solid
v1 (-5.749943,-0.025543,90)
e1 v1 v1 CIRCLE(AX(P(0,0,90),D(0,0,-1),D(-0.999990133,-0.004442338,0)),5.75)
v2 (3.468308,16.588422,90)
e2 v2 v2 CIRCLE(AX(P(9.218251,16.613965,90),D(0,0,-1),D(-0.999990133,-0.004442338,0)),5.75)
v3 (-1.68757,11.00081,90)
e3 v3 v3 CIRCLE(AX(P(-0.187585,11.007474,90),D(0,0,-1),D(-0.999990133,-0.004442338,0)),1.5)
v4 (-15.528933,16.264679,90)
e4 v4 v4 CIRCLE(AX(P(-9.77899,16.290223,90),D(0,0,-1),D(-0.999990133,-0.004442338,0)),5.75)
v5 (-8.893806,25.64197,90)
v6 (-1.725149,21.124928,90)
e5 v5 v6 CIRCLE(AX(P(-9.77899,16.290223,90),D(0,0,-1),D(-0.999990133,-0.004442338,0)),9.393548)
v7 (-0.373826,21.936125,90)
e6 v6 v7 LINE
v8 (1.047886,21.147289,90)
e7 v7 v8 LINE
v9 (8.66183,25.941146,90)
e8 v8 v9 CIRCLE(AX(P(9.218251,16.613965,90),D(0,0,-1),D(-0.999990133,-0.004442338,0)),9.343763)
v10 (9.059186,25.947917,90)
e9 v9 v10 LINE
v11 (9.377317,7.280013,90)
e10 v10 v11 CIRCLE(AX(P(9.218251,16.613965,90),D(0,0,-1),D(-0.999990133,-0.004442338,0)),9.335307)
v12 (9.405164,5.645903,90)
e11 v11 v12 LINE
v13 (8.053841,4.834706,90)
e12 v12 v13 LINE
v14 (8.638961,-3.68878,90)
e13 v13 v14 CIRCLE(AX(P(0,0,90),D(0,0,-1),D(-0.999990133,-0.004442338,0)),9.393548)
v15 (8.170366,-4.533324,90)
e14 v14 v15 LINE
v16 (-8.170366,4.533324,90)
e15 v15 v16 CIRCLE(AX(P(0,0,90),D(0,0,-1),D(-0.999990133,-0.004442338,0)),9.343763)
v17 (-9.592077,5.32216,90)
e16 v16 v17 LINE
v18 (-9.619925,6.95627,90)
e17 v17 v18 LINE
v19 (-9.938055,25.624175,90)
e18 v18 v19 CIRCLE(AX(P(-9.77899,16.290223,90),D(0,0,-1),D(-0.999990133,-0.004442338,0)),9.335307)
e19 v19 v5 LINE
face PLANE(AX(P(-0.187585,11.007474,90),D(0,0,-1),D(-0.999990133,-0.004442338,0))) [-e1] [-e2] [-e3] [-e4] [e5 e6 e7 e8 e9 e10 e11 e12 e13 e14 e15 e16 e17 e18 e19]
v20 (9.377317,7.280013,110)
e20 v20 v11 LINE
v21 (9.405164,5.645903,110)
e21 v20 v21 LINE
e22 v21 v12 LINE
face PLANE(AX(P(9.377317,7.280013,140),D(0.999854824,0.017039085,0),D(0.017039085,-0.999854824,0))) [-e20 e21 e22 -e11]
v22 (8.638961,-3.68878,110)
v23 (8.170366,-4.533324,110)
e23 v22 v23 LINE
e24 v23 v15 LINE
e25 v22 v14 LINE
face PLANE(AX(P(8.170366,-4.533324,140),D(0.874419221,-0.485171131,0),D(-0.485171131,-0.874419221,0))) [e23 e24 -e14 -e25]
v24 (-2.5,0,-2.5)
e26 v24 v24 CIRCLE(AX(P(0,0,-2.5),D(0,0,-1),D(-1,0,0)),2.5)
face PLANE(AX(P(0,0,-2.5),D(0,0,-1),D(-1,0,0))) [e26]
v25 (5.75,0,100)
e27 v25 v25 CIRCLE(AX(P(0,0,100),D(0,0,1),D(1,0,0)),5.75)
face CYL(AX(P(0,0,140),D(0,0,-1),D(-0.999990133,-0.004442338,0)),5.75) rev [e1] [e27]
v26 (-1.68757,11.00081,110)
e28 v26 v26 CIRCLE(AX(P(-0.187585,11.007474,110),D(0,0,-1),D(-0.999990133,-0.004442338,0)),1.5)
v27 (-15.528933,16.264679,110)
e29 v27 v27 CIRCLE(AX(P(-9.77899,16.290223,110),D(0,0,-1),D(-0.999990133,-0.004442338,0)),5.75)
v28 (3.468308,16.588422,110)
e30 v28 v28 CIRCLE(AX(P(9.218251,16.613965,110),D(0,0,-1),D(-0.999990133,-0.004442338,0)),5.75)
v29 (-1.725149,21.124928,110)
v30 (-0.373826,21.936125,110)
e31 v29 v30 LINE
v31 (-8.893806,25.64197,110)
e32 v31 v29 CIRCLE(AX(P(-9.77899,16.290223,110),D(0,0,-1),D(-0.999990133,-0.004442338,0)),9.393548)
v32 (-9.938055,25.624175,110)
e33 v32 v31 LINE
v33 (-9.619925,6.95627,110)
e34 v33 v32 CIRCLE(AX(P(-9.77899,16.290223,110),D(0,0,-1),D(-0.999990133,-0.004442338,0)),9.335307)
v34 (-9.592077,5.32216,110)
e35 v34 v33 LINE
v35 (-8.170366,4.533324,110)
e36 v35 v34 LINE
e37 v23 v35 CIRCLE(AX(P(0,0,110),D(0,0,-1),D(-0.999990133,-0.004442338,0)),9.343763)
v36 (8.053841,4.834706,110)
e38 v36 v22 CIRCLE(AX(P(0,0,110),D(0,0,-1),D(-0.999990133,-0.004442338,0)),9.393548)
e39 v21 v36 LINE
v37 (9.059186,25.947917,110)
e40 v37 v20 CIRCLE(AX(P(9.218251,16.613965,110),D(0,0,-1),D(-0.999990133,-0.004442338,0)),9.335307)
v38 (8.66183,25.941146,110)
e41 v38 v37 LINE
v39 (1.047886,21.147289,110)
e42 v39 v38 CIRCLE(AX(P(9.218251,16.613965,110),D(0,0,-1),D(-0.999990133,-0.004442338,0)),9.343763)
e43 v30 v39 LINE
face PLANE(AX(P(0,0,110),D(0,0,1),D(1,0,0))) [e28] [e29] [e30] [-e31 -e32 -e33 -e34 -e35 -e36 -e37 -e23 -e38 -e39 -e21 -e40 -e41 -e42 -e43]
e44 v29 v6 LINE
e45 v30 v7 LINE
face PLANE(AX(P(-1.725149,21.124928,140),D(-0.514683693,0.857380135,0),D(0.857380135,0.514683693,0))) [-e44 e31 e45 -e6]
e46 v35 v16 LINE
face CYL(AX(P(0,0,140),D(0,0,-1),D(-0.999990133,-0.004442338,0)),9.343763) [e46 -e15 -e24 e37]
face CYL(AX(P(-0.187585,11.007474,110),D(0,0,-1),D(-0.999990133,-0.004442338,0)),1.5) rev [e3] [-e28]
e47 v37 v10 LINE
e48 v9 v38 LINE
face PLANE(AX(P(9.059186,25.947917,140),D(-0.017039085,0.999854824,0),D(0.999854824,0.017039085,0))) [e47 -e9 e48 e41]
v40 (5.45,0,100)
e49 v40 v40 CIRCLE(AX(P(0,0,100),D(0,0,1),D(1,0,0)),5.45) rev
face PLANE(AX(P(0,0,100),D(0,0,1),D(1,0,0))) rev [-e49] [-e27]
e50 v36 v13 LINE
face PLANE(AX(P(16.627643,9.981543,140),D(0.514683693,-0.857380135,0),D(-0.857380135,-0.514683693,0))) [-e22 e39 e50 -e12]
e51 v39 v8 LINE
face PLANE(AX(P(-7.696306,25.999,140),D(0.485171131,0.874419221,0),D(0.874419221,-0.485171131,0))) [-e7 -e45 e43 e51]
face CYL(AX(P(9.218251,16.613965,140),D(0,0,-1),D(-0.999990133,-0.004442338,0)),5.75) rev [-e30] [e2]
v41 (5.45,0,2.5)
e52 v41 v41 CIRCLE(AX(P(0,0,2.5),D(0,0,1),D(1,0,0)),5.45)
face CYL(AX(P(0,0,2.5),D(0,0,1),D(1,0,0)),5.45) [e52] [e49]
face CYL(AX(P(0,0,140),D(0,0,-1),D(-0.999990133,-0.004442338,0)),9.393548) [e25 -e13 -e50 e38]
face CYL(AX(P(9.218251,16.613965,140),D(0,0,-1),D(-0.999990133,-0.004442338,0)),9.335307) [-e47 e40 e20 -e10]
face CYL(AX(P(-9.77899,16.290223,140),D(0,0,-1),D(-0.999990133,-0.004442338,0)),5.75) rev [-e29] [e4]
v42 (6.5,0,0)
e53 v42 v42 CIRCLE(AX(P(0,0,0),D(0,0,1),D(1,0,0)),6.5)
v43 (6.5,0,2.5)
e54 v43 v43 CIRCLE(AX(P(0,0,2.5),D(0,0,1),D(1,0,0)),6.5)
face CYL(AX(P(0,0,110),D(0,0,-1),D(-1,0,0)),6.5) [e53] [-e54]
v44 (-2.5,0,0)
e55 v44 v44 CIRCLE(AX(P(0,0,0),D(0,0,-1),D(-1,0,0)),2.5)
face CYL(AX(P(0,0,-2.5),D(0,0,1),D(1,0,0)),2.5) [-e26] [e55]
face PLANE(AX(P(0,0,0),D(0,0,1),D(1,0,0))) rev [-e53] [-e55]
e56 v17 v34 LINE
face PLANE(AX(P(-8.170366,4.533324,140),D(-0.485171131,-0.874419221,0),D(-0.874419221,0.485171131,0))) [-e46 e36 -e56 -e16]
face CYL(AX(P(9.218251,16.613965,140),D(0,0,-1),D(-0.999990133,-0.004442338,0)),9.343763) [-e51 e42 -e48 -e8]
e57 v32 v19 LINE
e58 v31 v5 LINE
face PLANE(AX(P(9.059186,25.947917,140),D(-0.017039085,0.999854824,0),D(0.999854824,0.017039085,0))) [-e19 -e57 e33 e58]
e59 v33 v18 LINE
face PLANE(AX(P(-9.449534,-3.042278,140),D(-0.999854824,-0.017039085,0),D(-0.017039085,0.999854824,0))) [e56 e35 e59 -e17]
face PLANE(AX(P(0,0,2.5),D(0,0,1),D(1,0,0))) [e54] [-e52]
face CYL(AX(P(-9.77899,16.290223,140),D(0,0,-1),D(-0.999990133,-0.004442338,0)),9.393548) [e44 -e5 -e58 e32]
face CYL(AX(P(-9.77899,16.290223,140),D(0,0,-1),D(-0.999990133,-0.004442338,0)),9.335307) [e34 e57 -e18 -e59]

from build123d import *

# Parameters (mm, degrees)
SKETCH1_R           = 6.5
BOSS_EXTRUDE1_DEPTH = 110
SKETCH6_R           = 2.5
BOSS_EXTRUDE2_DEPTH = 2.5
SKETCH7_R           = 2.65
CUT_EXTRUDE1_DEPTH  = 3
SKETCH9_OUTSIDE_W   = 37.798
SKETCH9_OUTSIDE_H   = 37.798
SKETCH9_OUTSIDE_R   = 5.45
CUT_EXTRUDE2_DEPTH  = 107.5
SKETCH10_R          = 5.75
BOSS_EXTRUDE3_DEPTH = 10
JOIN1_START         = 90
JOIN1_OUTLINE_R     = 5.75
JOIN1_OUTLINE_R_2   = 1.5
JOIN1_DEPTH         = 20


# Read off the part's stored shape, not the designer's step: Join1
with BuildPart() as part:
    # Sketch1 → Boss-Extrude1 (new body)
    with BuildSketch(Plane.XY):
        Circle(SKETCH1_R)
    extrude(amount=BOSS_EXTRUDE1_DEPTH)

    # Sketch6 → Boss-Extrude2 (add)
    with BuildSketch(Plane(origin=(0, 0, 0), x_dir=(-1, 0, 0), z_dir=(0, 0, -1))):
        Circle(SKETCH6_R)
    extrude(amount=BOSS_EXTRUDE2_DEPTH)

    # Sketch7 → Cut-Extrude1 (cut)
    with BuildSketch(Plane.XY.offset(110)):
        Circle(SKETCH7_R)
    extrude(amount=-CUT_EXTRUDE1_DEPTH, mode=Mode.SUBTRACT)

    # Sketch9 outside → Cut-Extrude2 (cut)
    with BuildSketch(Plane.XY.offset(110)):
        Rectangle(SKETCH9_OUTSIDE_W, SKETCH9_OUTSIDE_H)
        Circle(SKETCH9_OUTSIDE_R, mode=Mode.SUBTRACT)
    extrude(amount=-CUT_EXTRUDE2_DEPTH, mode=Mode.SUBTRACT)

    # Sketch10 → Boss-Extrude3 (add)
    with BuildSketch(Plane.XY.offset(110)):
        Circle(SKETCH10_R)
    extrude(amount=-BOSS_EXTRUDE3_DEPTH)

    # Join1 outline → Join1 (add)
    with BuildSketch(Plane.XY.offset(JOIN1_START)):
        with BuildLine():
            Line((-9.619925066, 6.956270405), (-9.592077276, 5.322159982))
            Line((-9.592077276, 5.322159982), (-8.170365761, 4.533323955))
            ThreePointArc((-8.170365761, 4.533323955), (-4.533323955, -8.170365761), (8.170365761, -4.533323955))
            Line((8.170365761, -4.533323955), (8.6389607, -3.688779845))
            ThreePointArc((8.6389607, -3.688779845), (9.371491926, 0.643333346), (8.053841212, 4.834705829))
            Line((8.053841212, 4.834705829), (9.405164385, 5.645902605))
            Line((9.405164385, 5.645902605), (9.377316595, 7.280013028))
            ThreePointArc((9.377316595, 7.280013028), (18.552203658, 16.773030292), (9.059186394, 25.947917355))
            Line((9.059186394, 25.947917355), (8.661829886, 25.941145781))
            ThreePointArc((8.661829886, 25.941145781), (4.239851168, 24.521014764), (1.047885733, 21.147289146))
            Line((1.047885733, 21.147289146), (-0.373825781, 21.936125173))
            Line((-0.373825781, 21.936125173), (-1.725148954, 21.124928398))
            ThreePointArc((-1.725148954, 21.124928398), (-4.771249912, 24.237629458), (-8.893805616, 25.641970375))
            Line((-8.893805616, 25.641970375), (-9.938055267, 25.624174732))
            ThreePointArc((-9.938055267, 25.624174732), (-19.11294233, 16.131157468), (-9.619925066, 6.956270405))
        make_face()
        Circle(JOIN1_OUTLINE_R, mode=Mode.SUBTRACT)
        with Locations((-9.778990166, 16.290222568)):
            Circle(JOIN1_OUTLINE_R, mode=Mode.SUBTRACT)
        with Locations((-0.187584514, 11.00747351)):
            Circle(JOIN1_OUTLINE_R_2, mode=Mode.SUBTRACT)
        with Locations((9.218251494, 16.613965192)):
            Circle(JOIN1_OUTLINE_R, mode=Mode.SUBTRACT)
    extrude(amount=JOIN1_DEPTH)


solid = part.part
